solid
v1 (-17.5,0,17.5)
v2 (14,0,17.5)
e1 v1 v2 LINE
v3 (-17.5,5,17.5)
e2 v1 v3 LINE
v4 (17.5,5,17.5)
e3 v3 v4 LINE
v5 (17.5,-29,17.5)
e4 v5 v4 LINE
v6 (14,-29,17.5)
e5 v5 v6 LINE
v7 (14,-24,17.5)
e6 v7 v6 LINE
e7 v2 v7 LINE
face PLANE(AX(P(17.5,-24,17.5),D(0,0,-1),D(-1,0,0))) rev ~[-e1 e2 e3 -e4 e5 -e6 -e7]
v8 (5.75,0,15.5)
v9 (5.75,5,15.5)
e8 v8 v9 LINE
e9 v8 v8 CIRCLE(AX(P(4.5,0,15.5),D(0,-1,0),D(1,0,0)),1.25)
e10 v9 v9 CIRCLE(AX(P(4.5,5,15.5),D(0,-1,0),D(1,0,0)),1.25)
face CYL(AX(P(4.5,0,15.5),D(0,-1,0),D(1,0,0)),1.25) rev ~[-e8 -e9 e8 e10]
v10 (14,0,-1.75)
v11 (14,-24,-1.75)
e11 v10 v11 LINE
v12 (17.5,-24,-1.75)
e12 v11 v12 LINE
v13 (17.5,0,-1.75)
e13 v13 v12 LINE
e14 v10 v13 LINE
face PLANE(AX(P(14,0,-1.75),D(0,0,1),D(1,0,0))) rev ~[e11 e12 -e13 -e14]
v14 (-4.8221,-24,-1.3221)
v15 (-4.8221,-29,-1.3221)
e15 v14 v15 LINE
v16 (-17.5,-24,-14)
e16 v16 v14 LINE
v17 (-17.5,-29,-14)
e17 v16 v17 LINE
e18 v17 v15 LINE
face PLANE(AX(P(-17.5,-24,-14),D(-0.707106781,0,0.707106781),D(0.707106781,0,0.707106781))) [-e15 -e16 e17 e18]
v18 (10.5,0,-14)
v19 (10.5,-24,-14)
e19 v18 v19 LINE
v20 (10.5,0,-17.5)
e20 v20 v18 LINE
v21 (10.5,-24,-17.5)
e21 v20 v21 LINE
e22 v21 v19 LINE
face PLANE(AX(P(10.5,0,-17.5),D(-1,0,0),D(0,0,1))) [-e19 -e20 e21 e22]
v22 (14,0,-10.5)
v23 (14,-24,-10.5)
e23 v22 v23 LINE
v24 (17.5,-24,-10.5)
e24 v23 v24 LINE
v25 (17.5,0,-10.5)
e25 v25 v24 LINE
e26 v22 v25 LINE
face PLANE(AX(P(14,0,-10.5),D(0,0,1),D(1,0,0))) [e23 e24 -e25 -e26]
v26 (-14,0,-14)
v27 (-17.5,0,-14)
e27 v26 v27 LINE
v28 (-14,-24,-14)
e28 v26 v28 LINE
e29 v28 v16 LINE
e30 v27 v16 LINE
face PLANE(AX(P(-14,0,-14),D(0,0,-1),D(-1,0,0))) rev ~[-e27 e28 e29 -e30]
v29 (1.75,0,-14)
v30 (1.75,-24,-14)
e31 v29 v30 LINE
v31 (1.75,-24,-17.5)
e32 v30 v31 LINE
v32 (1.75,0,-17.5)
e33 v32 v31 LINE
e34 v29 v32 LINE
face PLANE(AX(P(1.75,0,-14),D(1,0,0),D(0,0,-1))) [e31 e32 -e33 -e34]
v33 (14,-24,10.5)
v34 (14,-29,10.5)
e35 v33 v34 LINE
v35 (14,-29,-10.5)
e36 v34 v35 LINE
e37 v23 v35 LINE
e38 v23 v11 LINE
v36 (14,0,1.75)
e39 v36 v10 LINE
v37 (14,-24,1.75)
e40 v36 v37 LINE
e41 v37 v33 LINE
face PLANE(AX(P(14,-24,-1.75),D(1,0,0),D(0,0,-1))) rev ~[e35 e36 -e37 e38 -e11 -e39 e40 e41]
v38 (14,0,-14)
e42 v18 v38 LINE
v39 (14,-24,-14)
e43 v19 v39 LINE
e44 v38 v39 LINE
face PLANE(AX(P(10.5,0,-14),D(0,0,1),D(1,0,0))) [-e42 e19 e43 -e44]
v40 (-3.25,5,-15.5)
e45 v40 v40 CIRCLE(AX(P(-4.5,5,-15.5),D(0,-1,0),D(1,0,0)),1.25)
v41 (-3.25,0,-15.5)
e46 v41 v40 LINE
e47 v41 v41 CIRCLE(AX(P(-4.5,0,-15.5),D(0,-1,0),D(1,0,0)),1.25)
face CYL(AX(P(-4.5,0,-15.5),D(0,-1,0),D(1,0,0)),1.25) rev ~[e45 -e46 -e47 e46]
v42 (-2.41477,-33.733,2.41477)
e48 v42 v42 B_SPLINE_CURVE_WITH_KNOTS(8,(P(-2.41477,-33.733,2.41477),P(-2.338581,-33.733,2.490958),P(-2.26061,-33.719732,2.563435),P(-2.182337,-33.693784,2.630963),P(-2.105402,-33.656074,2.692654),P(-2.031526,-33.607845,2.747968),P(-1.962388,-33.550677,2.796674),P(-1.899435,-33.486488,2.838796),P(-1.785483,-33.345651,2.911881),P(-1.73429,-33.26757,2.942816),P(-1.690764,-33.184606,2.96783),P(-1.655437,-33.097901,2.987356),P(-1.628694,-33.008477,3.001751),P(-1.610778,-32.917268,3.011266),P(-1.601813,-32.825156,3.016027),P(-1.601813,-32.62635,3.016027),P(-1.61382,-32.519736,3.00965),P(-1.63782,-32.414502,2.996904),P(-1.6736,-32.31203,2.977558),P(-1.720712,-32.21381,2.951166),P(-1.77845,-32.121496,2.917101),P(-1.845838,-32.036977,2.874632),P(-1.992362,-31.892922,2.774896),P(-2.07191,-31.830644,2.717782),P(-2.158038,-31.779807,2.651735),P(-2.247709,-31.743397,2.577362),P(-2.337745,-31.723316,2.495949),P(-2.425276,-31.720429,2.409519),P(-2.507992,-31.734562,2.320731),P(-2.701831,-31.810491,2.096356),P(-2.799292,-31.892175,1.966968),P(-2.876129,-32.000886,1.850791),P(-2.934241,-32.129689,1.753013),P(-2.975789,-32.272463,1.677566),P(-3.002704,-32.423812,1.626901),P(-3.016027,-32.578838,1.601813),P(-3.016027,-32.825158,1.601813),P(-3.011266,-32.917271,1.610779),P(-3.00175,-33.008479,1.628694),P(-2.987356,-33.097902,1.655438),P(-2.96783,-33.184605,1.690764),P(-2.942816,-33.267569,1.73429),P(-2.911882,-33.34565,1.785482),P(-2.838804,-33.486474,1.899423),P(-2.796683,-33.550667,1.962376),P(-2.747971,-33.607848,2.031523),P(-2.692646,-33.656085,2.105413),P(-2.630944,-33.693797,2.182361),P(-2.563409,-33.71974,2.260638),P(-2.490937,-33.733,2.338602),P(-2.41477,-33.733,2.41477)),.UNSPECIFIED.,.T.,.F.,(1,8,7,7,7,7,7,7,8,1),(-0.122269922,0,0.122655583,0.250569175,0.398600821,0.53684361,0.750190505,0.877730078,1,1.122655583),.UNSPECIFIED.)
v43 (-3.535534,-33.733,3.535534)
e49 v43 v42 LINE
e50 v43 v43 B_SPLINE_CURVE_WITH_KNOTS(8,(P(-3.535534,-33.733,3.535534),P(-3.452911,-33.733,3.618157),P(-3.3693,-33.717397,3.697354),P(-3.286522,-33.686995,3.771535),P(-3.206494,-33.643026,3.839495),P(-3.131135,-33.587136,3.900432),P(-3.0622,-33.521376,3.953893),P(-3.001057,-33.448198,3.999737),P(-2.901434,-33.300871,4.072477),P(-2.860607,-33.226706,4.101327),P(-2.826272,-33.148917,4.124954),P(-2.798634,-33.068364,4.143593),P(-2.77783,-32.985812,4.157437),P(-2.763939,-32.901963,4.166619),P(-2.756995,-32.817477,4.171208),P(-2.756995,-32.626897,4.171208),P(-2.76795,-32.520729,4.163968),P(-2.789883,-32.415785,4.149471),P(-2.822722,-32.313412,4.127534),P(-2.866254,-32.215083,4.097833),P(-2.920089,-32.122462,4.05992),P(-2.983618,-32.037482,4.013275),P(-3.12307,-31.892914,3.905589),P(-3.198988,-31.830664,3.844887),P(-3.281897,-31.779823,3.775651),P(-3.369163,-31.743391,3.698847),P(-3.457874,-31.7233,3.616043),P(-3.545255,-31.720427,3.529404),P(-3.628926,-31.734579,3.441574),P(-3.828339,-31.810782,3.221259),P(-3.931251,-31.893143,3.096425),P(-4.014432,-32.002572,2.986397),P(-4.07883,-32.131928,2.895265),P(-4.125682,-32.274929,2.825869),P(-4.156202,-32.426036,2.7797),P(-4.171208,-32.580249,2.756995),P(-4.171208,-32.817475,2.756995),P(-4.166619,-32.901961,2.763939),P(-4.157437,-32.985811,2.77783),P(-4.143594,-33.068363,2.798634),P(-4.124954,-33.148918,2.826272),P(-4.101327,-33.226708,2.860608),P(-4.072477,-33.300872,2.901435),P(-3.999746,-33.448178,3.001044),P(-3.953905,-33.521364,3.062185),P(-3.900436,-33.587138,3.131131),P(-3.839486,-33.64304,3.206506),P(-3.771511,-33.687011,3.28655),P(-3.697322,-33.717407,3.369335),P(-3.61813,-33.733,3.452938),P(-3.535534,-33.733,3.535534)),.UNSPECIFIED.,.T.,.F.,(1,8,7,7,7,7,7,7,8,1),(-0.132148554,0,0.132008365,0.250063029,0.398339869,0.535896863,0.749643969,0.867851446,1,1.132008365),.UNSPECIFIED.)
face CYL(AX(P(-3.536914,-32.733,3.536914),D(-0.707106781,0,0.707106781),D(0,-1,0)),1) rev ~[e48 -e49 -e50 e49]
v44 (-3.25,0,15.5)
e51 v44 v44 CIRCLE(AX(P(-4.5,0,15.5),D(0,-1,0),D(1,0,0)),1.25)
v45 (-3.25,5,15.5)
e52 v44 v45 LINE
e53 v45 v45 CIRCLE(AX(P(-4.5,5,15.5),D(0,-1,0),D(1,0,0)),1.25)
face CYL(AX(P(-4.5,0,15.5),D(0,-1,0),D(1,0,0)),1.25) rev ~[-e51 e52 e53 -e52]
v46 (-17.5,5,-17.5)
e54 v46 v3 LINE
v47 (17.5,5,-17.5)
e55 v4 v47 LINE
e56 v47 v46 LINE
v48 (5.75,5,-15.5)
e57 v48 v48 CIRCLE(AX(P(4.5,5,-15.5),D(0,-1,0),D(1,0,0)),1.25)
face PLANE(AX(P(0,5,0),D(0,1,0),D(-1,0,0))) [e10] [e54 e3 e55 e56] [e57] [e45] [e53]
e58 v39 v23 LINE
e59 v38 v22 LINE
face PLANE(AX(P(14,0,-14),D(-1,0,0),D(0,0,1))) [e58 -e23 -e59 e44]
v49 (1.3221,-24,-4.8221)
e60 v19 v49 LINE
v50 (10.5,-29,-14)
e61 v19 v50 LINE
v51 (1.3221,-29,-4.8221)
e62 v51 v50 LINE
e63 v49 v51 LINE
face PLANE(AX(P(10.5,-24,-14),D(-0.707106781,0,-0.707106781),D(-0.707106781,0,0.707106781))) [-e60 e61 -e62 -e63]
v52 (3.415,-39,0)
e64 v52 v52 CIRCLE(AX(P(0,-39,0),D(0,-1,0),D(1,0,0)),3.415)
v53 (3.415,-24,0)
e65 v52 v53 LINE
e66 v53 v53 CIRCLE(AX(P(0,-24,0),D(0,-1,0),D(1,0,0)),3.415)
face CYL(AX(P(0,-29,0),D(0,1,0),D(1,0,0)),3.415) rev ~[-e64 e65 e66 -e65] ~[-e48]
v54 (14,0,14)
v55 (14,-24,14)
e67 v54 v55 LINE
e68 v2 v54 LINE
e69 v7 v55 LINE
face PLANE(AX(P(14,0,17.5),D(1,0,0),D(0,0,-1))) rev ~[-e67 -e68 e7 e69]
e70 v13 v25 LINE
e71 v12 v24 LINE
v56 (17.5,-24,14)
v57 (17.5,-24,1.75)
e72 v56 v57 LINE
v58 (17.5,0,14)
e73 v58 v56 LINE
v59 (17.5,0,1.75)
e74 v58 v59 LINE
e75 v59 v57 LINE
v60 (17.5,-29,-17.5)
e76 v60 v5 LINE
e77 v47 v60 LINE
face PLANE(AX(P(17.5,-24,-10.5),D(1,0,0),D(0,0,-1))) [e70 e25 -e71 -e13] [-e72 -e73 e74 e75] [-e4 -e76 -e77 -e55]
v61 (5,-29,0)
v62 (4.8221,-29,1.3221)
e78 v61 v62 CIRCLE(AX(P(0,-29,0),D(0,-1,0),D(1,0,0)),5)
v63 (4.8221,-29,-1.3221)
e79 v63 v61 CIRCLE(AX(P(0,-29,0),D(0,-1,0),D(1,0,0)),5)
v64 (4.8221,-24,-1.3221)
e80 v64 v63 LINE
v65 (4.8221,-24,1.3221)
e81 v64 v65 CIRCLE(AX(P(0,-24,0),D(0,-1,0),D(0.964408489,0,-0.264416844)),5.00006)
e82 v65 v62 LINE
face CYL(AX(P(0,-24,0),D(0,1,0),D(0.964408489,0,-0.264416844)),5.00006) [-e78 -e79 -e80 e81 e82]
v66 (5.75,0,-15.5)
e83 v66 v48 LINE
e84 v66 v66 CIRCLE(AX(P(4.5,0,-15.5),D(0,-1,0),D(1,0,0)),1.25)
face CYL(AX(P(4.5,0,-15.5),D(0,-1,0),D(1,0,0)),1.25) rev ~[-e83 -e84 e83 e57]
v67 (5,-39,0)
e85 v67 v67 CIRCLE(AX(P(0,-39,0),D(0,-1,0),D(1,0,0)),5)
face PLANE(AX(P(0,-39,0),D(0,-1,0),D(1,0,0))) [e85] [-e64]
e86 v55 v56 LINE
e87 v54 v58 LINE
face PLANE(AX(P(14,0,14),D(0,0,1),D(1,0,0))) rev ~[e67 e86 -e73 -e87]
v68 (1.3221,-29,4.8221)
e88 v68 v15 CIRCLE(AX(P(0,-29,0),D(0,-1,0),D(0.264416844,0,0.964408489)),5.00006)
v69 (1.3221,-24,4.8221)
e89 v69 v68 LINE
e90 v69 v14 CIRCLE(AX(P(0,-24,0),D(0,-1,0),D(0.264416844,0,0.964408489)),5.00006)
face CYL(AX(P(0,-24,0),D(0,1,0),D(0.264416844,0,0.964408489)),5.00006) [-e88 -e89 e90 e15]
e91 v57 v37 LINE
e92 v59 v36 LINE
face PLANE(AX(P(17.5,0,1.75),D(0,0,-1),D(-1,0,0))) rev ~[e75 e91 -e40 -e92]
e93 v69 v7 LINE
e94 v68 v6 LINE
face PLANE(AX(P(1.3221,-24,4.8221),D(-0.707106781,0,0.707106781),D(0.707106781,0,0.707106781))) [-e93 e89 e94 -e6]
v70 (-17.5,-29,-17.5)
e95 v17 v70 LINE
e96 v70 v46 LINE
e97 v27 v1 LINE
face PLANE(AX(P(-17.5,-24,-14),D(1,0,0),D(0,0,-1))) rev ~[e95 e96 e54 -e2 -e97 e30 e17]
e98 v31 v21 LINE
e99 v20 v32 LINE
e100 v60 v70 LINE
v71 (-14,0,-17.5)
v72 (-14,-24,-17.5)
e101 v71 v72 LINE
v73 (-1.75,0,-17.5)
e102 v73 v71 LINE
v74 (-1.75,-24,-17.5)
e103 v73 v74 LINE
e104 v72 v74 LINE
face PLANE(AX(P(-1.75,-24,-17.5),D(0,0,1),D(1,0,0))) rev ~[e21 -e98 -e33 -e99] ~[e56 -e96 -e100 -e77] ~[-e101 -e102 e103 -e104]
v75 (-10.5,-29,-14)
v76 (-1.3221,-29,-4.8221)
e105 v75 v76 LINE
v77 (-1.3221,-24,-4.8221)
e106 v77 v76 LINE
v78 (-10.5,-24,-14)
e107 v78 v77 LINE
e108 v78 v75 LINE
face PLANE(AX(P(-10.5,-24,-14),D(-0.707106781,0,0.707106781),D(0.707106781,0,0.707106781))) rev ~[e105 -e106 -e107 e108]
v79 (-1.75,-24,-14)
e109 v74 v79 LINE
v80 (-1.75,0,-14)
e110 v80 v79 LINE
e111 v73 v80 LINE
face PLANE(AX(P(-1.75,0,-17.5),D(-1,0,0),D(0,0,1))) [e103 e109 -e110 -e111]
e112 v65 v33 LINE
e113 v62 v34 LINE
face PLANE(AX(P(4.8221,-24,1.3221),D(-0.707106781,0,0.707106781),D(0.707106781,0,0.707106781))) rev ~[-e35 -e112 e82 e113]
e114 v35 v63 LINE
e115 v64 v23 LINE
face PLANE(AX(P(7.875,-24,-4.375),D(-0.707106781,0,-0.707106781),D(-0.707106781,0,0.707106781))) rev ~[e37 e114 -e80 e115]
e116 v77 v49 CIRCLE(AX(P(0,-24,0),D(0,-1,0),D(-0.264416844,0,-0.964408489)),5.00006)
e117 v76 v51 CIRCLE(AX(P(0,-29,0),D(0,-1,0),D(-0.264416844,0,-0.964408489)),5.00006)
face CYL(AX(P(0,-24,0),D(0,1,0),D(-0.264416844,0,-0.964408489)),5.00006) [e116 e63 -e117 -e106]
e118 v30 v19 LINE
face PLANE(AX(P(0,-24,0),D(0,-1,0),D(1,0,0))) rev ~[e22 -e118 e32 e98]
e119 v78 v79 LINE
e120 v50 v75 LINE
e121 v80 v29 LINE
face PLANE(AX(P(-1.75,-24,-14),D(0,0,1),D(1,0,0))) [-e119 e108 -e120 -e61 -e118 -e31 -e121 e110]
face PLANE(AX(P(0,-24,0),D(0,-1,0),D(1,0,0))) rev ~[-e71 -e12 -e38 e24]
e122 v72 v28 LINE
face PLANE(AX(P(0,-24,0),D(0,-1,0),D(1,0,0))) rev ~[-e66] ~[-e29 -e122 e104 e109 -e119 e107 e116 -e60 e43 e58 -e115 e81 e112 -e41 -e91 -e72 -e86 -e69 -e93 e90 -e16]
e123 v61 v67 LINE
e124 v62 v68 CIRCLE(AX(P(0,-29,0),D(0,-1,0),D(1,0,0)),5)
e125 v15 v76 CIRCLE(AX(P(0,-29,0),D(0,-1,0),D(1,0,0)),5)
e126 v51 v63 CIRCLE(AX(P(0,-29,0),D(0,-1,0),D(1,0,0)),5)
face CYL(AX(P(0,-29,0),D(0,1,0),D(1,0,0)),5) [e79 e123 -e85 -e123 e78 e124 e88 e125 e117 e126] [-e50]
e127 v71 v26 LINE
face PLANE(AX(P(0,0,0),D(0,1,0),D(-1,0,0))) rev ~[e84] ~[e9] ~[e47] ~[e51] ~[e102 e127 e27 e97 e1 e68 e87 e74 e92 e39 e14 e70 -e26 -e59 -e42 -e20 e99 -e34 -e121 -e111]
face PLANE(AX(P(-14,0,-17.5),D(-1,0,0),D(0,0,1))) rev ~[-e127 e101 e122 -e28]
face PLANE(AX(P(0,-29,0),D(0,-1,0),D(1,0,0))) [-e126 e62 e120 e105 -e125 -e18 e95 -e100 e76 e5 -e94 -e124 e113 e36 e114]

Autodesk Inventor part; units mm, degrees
ref_plane "YZ Plane" through (0, 0, 0) normal (1, 0, 0) x (0, 1, 0)
ref_plane "XZ Plane" through (0, 0, 0) normal (0, 1, 0) x (-1, 0, 0)
ref_plane "XY Plane" through (0, 0, 0) normal (0, 0, 1) x (1, 0, 0)
sketch "Sketch1" plane through (0, 0, 0) normal (0, 1, 0) x (-1, 0, 0)
  line L0 (-17.5, -17.5) -> (17.5, -17.5)
  line L1 (17.5, -17.5) -> (17.5, 17.5)
  line L2 (17.5, 17.5) -> (-17.5, 17.5)
  line L3 (-17.5, 17.5) -> (-17.5, -17.5)
  line L4 (-17.5, -17.5) -> (17.5, 17.5) construction
  line L5 (17.5, -17.5) -> (-17.5, 17.5) construction
  point P0 (0, 0)
  dimension "d0" = 35
  dimension "d1" = 35
extrude "Extrusion1" add sketch "Sketch1" along normal blind 5
sketch "Sketch2" plane through (0, 0, 0) normal (0, -1, 0) x (1, 0, 0)
  circle A0 centre (4.5, 15.5) radius 1.25 projected
  circle A1 centre (-4.5, 15.5) radius 1.25 projected
  circle A2 centre (4.5, -15.5) radius 1.25 projected
  circle A3 centre (-4.5, -15.5) radius 1.25 projected
  point P0 (0, 0)
extrude "Extrusion2" cut sketch "Sketch2" against normal blind 5
sketch "Sketch3" plane through (0, 0, 0) normal (0, -1, 0) x (1, 0, 0)
  line L0 (-17.5, -17.5) -> (-17.5, 17.5) projected
  line L1 (-17.5, -17.5) -> (-14, -17.5)
  line L2 (-14, -17.5) -> (-14, -14)
  line L3 (-14, -14) -> (-17.5, -14)
  line L4 (-17.5, -14) -> (-17.5, -17.5)
  line L5 (17.5, 17.5) -> (17.5, -17.5) projected
  line L6 (17.5, -17.5) -> (10.5, -17.5)
  line L7 (10.5, -17.5) -> (10.5, -14)
  line L8 (10.5, -14) -> (17.5, -14)
  line L9 (17.5, -14) -> (17.5, -17.5)
  line L10 (17.5, -14) -> (14, -14)
  line L11 (14, -14) -> (14, -10.5)
  line L12 (14, -10.5) -> (17.5, -10.5)
  line L13 (17.5, -10.5) -> (17.5, -14)
  line L14 (17.5, 17.5) -> (14, 17.5)
  line L15 (14, 17.5) -> (14, 14)
  line L16 (14, 14) -> (17.5, 14)
  line L17 (17.5, 14) -> (17.5, 17.5)
  line L18 (17.5, -17.5) -> (-17.5, -17.5) projected
  line L19 (1.75, -17.5) -> (-1.75, -17.5)
  line L20 (-1.75, -17.5) -> (-1.75, -14)
  line L21 (-1.75, -14) -> (1.75, -14)
  line L22 (1.75, -14) -> (1.75, -17.5)
  line L23 (17.5, 17.5) -> (17.5, -17.5) projected
  line L24 (17.5, 1.75) -> (14, 1.75)
  line L25 (14, 1.75) -> (14, -1.75)
  line L26 (14, -1.75) -> (17.5, -1.75)
  line L27 (17.5, -1.75) -> (17.5, 1.75)
  point P0 (0, 0)
  dimension "d6" = 3.5
  dimension "d7" = 3.5
  dimension "d8" = 7
  dimension "d9" = 3.5
  dimension "d10" = 3.5
  dimension "d11" = 3.5
  dimension "d12" = 3.5
  dimension "d13" = 3.5
  dimension "d14" = 3.5
  dimension "d15" = 3.5
  dimension "d16" = 3.5
  dimension "d17" = 3.5
  dimension "d18" = 1.75
  dimension "d19" = 1.75
extrude "Extrusion3" add sketch "Sketch3" along normal blind 24
sketch "Sketch4" plane through (0, -24, 0) normal (0, -1, 0) x (1, 0, 0)
  line L0 (-17.5, -14) -> (-14, -14) projected
  line L1 (14, 14) -> (14, 17.5) projected
  line L2 (10.5, -17.5) -> (10.5, -14) projected
  line L3 (14, -10.5) -> (17.5, -10.5) projected
  line L4 (-17.5, -14) -> (-17.5, -17.5) projected
  line L5 (-17.5, -14) -> (-17.5, -17.5)
  line L6 (17.5, 17.5) -> (17.5, -17.5) projected
  line L7 (-17.5, -17.5) -> (17.5, -17.5)
  line L8 (17.5, -17.5) -> (17.5, 17.5)
  line L9 (17.5, 17.5) -> (14, 17.5) projected
  line L10 (17.5, 17.5) -> (14, 17.5)
  line L11 (14, -14) -> (10.5, -14) projected
  line L12 (14, 17.5) -> (14, 14) projected
  line L13 (-17.5, -14) -> (-4.8221, -1.3221)
  line L14 (1.3221, 4.8221) -> (14, 17.5)
  line L15 (-10.5, -14) -> (-1.3221, -4.8221)
  line L16 (4.8221, 1.3221) -> (14, 10.5)
  line L17 (10.5, -14) -> (7.875, -11.375)
  line L18 (4.375, -7.875) -> (1.3221, -4.8221)
  line L19 (14, -10.5) -> (11.375, -7.875)
  line L20 (7.875, -4.375) -> (4.8221, -1.3221)
  line L21 (-10.5, -14) -> (-1.75, -14)
  line L22 (5.25, -14) -> (10.5, -14)
  circle A0 centre (0, 0) radius 3.415
  arc A1 (-1.3221, -4.8221) -> (1.3221, -4.8221) centre (0, 0) ccw
  arc A2 (4.8221, -1.3221) -> (4.8221, 1.3221) centre (0, 0) ccw
  arc A3 (1.3221, 4.8221) -> (-4.8221, -1.3221) centre (0, 0) ccw
  line L23 (10.5, -14) -> (7.875, -11.375)
  line L24 (10.5, -14) -> (14, -14) projected
  line L25 (5.25, -14) -> (10.5, -14)
  line L26 (-1.75, -17.5) -> (-1.75, -14) projected
  line L27 (-1.75, -14) -> (5.25, -14)
  line L28 (14, -1.75) -> (14, 1.75) projected
  line L29 (7.875, -4.375) -> (11.375, -7.875)
  line L30 (7.875, -11.375) -> (4.375, -7.875)
  line L31 (14, 10.5) -> (14, -10.5)
  point P0 (-14, -17.5)
  point P1 (17.5, 14)
  point P2 (17.5, -1.75)
  dimension "d28" = 6.83
ref_plane "Work Plane1" through (-3.5355, -24, 3.5355) normal (-0.7071068, 0, 0.7071068) x (0, -1, 0)
ref_plane "Work Plane2" through (0, -29, 0) normal (0, -1, 0) x (1, 0, 0)
sketch "Sketch6" plane through (0, -29, 0) normal (0, -1, 0) x (1, 0, 0)
  circle A0 centre (0, 0) radius 3.415
  circle A1 centre (0, 0) radius 5
extrude "Extrusion6" add sketch "Sketch6" along normal blind 10
sketch "Sketch7" plane through (-3.5355, -24, 3.5355) normal (-0.7071068, 0, 0.7071068) x (0, -1, 0)
  circle A0 centre (8.733, 0) radius 1
  point P0 (-24, 0)
  dimension "d31" = 2
extrude "Extrusion7" cut sketch "Sketch7" against normal blind 2
extrude "Extrusion9" add sketch "Sketch4" along normal blind 5 contours L7 L26 L27 L22 L2 | L2 L17 L30 L18 A1 L15 L21 L26 L7 L4 L13 A3 L14 L9 L6
properties part number "Sy_holder"
